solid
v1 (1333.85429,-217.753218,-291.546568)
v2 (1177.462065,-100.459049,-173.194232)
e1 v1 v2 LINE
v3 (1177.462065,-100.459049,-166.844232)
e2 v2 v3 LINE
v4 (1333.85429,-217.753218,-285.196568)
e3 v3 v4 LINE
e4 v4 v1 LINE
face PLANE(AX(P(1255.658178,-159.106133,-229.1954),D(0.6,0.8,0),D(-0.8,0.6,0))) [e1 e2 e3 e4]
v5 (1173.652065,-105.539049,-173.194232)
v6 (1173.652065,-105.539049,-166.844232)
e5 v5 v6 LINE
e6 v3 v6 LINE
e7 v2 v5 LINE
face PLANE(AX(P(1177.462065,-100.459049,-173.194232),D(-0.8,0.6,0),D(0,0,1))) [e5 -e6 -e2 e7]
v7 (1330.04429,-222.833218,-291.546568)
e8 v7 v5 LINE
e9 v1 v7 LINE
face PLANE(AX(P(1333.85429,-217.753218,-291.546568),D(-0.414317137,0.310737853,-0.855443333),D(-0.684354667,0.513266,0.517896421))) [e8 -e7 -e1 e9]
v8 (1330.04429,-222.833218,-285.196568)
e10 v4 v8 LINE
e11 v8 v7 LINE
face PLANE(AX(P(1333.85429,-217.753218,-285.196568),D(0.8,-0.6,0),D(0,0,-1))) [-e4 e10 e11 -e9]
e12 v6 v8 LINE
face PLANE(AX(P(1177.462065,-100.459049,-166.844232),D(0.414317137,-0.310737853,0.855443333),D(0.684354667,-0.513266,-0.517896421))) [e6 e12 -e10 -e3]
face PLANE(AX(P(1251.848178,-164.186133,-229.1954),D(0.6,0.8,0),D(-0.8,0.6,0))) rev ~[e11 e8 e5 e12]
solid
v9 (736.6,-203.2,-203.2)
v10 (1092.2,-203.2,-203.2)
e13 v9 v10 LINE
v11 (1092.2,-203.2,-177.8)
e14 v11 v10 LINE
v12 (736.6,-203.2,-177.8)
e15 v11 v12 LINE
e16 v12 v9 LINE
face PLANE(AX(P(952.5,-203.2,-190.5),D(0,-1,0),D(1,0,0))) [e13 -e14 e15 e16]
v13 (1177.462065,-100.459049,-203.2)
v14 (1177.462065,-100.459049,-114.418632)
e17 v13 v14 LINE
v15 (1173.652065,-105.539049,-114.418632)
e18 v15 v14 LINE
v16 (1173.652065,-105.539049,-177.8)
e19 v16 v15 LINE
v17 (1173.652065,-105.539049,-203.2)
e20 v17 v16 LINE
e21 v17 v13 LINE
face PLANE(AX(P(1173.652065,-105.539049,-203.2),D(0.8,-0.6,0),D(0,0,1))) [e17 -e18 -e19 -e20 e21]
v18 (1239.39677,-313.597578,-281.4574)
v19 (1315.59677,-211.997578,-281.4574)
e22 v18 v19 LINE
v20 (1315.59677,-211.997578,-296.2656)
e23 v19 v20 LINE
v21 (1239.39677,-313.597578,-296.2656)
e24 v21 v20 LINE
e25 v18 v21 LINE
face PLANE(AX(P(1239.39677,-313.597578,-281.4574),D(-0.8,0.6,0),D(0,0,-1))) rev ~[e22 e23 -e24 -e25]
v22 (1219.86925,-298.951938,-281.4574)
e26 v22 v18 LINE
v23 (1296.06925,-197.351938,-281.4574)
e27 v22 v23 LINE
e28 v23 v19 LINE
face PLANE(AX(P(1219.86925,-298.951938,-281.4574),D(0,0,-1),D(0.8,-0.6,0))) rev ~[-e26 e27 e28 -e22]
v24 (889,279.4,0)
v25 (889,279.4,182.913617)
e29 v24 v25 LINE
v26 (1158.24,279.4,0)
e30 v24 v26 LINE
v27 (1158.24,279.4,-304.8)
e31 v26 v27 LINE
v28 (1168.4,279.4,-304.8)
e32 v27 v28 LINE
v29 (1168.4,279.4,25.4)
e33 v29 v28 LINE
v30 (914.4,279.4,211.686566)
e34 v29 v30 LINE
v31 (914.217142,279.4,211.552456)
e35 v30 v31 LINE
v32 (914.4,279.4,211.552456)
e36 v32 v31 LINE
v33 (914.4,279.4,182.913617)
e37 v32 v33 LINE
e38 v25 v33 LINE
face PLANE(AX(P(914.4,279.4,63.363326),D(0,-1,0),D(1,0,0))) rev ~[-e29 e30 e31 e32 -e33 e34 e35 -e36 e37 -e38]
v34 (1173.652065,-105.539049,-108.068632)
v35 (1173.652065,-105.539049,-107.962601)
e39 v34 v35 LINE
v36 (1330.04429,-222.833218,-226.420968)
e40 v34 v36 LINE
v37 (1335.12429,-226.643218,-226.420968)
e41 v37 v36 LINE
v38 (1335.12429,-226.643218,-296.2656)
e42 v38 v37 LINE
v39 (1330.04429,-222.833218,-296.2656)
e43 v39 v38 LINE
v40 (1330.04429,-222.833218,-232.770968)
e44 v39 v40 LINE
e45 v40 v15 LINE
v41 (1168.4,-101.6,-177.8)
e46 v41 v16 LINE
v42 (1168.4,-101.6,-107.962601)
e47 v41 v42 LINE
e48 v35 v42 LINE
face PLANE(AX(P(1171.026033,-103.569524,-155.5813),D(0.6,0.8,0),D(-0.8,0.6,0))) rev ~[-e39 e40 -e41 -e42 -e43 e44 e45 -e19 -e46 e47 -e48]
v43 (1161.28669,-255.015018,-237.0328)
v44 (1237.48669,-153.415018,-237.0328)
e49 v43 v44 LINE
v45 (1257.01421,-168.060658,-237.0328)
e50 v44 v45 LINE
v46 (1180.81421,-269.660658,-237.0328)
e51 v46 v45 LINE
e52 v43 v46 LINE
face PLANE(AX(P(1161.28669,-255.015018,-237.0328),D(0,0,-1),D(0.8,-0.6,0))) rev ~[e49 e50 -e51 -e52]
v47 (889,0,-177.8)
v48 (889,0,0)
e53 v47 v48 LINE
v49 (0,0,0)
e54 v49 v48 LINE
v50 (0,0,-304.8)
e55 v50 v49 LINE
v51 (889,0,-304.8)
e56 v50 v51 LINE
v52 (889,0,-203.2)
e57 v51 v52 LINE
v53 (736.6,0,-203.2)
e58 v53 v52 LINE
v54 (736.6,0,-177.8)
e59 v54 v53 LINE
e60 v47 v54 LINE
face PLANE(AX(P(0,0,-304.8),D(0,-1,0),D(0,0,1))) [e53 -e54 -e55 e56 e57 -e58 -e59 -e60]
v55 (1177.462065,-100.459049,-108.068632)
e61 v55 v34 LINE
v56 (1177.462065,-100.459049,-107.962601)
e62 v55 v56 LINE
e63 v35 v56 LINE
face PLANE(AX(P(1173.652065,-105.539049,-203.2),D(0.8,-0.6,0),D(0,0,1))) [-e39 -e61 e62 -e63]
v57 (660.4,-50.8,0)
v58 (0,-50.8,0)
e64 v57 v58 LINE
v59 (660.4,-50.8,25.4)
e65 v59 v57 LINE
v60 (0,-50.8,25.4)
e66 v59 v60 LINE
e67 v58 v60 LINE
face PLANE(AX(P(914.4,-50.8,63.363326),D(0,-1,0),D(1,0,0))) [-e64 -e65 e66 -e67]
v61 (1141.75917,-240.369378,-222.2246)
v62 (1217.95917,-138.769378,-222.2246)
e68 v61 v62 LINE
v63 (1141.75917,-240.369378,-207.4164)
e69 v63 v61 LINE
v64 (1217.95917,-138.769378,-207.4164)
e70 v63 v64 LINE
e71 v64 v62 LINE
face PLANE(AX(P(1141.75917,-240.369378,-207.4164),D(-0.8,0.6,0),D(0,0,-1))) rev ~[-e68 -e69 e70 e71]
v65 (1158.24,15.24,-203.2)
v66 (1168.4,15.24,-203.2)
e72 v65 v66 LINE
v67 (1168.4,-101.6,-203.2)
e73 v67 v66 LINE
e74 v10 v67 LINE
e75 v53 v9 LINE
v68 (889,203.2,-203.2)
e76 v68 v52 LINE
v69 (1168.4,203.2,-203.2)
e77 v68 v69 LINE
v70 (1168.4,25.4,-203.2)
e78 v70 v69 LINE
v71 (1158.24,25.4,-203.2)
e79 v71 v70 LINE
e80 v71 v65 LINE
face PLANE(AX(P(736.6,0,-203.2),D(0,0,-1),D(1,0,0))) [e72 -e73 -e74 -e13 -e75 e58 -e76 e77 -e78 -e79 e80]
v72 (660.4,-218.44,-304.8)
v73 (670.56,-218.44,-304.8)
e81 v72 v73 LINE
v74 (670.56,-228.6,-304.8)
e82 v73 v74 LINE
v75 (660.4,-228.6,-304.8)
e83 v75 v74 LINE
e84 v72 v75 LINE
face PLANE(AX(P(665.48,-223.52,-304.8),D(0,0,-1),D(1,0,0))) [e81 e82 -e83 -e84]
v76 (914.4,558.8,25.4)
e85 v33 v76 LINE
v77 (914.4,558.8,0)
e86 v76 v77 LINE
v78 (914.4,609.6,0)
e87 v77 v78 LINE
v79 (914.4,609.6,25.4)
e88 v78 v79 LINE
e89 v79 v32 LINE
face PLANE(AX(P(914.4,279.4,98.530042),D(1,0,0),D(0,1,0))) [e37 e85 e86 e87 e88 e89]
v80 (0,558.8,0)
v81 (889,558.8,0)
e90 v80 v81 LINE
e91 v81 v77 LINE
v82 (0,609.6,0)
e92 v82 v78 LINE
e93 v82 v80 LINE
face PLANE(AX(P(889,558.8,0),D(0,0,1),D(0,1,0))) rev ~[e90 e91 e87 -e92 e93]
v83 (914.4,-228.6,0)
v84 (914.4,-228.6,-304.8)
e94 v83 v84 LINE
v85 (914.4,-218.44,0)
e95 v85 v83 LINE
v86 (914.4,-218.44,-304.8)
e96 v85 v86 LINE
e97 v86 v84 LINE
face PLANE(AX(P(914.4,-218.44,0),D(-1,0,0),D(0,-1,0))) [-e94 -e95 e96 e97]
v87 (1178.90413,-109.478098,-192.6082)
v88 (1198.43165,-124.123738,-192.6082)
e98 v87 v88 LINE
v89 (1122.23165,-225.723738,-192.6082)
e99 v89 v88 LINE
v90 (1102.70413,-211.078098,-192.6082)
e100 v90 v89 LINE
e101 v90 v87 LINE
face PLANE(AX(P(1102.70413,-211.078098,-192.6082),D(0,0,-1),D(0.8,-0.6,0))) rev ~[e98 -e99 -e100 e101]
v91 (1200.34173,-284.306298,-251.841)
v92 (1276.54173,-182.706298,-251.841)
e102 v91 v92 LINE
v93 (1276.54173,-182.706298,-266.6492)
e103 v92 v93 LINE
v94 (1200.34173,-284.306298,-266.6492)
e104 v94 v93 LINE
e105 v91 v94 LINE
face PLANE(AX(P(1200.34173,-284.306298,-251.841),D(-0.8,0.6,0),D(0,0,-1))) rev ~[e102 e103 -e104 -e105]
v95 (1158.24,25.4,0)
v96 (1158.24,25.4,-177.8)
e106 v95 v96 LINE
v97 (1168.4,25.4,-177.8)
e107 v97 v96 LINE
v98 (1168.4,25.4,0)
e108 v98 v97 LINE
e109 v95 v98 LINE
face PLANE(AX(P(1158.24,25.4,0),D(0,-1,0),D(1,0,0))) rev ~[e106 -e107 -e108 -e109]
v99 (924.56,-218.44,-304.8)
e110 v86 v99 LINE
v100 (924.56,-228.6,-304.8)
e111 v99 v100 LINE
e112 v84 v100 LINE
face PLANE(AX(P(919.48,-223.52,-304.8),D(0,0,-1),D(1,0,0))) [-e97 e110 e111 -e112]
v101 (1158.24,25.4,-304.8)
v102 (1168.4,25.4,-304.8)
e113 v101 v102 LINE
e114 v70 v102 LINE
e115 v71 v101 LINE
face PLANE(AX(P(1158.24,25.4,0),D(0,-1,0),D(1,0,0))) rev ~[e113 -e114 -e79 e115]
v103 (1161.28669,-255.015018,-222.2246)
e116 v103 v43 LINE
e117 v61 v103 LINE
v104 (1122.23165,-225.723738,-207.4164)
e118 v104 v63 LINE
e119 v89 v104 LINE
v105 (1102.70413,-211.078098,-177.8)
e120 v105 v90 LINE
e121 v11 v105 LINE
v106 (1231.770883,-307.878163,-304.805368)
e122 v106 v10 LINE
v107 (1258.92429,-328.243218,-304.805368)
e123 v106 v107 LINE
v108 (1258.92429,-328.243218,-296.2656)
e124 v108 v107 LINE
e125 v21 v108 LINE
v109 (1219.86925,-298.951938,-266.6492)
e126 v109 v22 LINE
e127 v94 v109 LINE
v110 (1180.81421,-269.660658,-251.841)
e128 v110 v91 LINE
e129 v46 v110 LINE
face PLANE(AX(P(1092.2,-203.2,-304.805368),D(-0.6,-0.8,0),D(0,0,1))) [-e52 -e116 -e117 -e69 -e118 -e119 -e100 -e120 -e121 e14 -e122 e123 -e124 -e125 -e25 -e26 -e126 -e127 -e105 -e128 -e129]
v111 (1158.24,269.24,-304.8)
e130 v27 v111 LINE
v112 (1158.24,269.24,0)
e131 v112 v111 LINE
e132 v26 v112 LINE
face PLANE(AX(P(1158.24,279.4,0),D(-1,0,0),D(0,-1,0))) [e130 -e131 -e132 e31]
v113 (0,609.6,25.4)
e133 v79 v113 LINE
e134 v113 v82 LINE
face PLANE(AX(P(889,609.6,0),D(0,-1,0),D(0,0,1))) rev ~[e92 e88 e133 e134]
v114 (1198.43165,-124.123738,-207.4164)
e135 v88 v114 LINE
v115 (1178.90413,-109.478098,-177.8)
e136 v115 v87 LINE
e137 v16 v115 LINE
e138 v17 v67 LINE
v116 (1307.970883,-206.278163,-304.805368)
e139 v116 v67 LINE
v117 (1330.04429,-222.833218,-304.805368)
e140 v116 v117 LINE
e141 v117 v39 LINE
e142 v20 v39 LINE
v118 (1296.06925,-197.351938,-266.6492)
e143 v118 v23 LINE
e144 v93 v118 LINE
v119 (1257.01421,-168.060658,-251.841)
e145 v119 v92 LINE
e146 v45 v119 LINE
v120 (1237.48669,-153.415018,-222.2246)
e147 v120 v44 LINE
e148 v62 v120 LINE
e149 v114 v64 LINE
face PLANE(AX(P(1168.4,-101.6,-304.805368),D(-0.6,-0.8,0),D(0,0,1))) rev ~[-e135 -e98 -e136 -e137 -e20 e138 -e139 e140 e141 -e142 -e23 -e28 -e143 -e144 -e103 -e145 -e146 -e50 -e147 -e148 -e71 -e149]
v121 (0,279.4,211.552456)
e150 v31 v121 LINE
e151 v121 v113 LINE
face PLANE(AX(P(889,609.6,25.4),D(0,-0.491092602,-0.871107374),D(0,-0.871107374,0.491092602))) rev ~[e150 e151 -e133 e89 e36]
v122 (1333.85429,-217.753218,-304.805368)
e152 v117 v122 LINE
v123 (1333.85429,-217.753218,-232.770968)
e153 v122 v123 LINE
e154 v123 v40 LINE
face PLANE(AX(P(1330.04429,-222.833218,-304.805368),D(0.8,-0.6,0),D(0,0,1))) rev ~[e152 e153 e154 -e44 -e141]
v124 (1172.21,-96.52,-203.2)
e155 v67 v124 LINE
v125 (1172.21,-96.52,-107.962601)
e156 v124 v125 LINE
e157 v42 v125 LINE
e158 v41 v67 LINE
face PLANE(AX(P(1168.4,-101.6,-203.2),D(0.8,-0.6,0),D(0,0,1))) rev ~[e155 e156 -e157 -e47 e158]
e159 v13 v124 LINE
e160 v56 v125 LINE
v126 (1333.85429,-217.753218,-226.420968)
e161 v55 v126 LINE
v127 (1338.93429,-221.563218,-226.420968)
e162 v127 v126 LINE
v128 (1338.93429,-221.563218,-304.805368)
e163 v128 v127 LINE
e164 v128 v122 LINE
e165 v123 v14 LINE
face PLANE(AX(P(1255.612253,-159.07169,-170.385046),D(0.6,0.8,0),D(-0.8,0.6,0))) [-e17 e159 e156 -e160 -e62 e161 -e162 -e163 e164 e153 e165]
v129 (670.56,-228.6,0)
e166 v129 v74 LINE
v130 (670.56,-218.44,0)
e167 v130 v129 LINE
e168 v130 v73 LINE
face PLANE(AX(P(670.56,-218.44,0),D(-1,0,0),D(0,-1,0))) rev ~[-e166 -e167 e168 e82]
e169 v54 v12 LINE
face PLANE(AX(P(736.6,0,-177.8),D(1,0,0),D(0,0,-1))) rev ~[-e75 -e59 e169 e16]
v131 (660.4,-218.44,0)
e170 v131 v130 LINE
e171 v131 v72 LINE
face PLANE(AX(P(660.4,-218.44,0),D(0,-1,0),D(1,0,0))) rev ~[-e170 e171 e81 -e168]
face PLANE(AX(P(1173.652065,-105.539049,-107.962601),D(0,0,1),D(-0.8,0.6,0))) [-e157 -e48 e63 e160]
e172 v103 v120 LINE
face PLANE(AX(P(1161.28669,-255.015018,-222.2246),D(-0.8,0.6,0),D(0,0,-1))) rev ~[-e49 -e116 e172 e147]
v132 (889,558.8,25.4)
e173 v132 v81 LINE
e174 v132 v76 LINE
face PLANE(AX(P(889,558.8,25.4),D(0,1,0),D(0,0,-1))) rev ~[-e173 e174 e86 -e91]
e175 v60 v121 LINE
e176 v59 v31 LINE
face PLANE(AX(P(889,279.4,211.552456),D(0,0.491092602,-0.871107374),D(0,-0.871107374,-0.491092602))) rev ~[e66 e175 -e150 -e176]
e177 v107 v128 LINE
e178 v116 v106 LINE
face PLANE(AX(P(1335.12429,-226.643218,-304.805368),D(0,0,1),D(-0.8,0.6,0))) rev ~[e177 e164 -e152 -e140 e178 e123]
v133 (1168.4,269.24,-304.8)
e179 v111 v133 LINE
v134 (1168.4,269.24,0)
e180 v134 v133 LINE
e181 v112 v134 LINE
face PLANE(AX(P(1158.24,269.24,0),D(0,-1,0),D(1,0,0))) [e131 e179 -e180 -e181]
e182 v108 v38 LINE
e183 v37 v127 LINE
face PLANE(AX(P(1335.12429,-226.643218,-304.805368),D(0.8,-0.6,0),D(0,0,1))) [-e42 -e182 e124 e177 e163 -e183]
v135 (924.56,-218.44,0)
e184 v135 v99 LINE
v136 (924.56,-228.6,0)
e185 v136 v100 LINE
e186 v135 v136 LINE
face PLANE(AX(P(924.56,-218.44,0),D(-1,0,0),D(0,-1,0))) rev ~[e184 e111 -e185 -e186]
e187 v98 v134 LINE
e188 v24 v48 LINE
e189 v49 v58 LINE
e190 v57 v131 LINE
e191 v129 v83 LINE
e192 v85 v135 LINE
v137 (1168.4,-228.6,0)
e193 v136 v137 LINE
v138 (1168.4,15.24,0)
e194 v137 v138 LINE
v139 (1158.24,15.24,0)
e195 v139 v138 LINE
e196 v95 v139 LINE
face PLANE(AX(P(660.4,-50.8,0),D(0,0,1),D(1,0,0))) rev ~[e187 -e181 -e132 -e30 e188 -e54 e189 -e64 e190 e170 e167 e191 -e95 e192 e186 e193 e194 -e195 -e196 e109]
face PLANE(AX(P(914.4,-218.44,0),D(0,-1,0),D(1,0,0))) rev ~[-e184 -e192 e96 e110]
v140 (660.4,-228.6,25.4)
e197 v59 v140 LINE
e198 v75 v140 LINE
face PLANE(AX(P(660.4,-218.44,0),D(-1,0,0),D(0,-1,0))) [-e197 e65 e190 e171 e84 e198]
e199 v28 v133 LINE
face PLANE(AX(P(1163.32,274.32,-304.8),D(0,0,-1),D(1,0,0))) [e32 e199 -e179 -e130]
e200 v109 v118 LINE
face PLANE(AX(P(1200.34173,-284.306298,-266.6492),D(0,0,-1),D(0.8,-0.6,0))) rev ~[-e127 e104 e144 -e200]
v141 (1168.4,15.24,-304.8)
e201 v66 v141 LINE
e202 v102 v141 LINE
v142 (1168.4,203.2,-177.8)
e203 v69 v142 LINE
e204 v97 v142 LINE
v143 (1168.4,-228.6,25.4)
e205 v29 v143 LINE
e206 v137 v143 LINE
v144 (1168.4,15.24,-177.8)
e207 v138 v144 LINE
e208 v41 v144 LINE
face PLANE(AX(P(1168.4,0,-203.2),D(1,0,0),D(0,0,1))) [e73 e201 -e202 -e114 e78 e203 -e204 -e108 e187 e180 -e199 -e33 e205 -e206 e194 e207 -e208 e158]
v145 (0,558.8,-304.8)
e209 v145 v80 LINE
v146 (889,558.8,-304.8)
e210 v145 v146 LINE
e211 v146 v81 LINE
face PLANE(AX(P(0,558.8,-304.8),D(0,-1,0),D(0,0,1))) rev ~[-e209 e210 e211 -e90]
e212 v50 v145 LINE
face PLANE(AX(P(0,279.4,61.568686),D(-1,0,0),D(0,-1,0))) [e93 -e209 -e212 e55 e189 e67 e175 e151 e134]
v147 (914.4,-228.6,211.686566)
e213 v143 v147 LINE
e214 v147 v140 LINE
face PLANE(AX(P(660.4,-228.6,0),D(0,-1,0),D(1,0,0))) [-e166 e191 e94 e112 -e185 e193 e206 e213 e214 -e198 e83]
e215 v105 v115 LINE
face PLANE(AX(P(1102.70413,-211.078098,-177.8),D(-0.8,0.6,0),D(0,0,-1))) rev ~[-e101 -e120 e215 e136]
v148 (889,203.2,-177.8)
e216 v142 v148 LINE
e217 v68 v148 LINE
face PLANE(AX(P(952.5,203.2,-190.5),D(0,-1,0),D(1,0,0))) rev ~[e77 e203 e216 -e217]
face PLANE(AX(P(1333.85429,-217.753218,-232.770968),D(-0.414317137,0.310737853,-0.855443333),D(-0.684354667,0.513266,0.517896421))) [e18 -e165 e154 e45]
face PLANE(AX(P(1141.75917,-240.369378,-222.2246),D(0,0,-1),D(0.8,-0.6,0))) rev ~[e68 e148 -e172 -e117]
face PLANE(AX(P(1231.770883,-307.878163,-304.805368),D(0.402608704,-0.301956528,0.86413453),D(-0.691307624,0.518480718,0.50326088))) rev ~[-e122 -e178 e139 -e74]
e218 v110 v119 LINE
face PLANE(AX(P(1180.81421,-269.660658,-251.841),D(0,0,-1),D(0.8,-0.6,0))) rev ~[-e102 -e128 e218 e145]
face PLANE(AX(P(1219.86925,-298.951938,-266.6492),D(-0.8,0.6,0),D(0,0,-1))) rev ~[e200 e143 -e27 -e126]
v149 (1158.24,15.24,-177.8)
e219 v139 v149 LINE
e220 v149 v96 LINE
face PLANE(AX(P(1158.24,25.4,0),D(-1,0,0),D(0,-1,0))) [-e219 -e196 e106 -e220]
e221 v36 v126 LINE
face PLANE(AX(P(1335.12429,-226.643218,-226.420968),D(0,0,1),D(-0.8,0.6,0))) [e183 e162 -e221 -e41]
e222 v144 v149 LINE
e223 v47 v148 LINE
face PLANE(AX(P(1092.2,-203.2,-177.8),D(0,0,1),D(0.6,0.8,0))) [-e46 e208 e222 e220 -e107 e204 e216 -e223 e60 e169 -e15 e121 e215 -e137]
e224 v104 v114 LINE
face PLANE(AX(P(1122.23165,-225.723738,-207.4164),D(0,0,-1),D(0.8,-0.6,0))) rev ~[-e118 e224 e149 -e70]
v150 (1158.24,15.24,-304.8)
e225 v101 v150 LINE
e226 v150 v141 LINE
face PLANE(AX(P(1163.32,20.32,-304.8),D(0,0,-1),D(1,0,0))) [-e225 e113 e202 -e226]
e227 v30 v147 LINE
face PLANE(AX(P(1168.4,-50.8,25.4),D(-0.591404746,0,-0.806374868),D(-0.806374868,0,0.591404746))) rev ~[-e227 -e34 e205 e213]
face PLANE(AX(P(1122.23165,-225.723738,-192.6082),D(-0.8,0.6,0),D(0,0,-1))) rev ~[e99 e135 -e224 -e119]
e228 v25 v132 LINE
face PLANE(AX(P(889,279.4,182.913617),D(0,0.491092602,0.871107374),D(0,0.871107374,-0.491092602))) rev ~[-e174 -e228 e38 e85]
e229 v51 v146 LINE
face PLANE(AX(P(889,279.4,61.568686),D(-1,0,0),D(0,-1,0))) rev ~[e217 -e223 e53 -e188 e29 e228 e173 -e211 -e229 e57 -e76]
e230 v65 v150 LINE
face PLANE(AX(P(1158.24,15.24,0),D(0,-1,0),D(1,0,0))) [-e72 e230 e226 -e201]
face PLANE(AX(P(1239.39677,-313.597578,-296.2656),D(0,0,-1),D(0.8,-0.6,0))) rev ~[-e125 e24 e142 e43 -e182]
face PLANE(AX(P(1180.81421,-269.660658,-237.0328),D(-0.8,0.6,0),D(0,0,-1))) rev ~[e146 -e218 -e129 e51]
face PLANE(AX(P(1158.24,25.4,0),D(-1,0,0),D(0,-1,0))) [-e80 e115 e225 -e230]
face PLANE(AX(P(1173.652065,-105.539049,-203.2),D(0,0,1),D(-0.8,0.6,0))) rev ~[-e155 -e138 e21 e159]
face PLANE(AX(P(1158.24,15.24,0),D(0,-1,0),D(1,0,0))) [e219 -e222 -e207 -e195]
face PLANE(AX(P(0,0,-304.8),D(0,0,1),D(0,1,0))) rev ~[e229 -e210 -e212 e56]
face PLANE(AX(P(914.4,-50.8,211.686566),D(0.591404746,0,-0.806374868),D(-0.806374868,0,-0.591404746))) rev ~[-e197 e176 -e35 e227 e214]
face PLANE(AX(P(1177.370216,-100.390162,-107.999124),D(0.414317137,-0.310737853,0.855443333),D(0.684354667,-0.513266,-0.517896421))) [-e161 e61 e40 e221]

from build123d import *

# Parameters (mm, degrees)
F0_W           = 558.8
F0_H           = 304.8
F1_DEPTH       = 889
F3_DEPTH       = 889
F5_DEPTH       = 25.4
F7_DEPTH       = 330.2
F7_DEPTH_BACK  = 177.8
F8_W           = 10.16
F8_H           = 10.16
F9_DEPTH       = 304.8
F11_DEPTH      = 203.2
F11_DEPTH_BACK = 203.2
F14_DEPTH      = 25.4
F15_W          = 6.35
F15_H          = 127.005368185
F16_DEPTH      = 304.8
F18_DEPTH      = 25.4
F19_DEPTH      = 127
F20_W          = 6.5650812721
F20_H          = 95.2373991132
F21_DEPTH      = 6.35
F22_W          = 6.35
F22_H          = 78.3844
F23_DEPTH      = 6.35
F25_DEPTH      = 6.35
F27_DEPTH      = 6.35


# Not quite as in the source:
# - a feature of the source that left no trace in its solid (it failed there, or was rolled back) is left out


with BuildPart() as f1:
    # F0 (on Right) → F1 (new body)
    with BuildSketch(Plane.YZ):
        with Locations((279.4, -152.4)):
            Rectangle(F0_W, F0_H)
    extrude(amount=F1_DEPTH)

    # F2 (on face) → F3 (join)
    with BuildSketch(Plane(origin=(0, 0, 0), x_dir=(0, -1, 0), z_dir=(-1, 0, 0))):
        Polygon((-609.6, 0), (-558.8, 0), (0, 0), (50.8, 0), (50.8, 25.4), (-279.4, 211.5524560213), (-609.6, 25.4), align=None)
    extrude(amount=-F3_DEPTH)

    # F4 (on face) → F5 (join)
    with BuildSketch(Plane.YZ.offset(889)):
        Polygon((-50.8, 25.4), (-50.8, 0), (0, 0), (0, 25.4), (279.4, 182.9136166334), (558.8, 25.4), (558.8, 0), (609.6, 0), (609.6, 25.4), (279.4, 211.5524560213), align=None)
    extrude(amount=F5_DEPTH)

    # F6 (on face) → F7 (join, two sides)
    with BuildSketch(Plane.XZ.offset(50.8)) as f7_sk:
        Polygon((889, 0), (914.4, 0), (1168.4, 0), (1168.4, 25.4), (914.4, 211.6865664721), (660.4, 25.4), (660.4, 0), align=None)
    extrude(amount=-F7_DEPTH)
    extrude(f7_sk.sketch, amount=F7_DEPTH_BACK)

    # F8 (on face) → F9 (join)
    with BuildSketch(Plane(origin=(0, 0, 0), x_dir=(1, 0, 0), z_dir=(0, 0, -1))):
        with Locations((665.48, 223.52)):
            Rectangle(F8_W, F8_H)
        with Locations((1163.32, -274.32)):
            Rectangle(F8_W, F8_H)
        with Locations((1163.32, -20.32)):
            Rectangle(F8_W, F8_H)
        with Locations((919.48, 223.52)):
            Rectangle(F8_W, F8_H)
    extrude(amount=F9_DEPTH)

    # F10 (on face) → F11 (join, two sides)
    with BuildSketch(Plane.XZ) as f11_sk:
        Polygon((1168.4, -177.8), (889, -177.8), (736.6, -177.8), (736.6, -203.2), (1168.4, -203.2), align=None)
    extrude(amount=F11_DEPTH)
    extrude(f11_sk.sketch, amount=-F11_DEPTH_BACK)

    # F13 (on face) → F14 (cut)
    with BuildSketch(Plane.XY.offset(-177.8)):
        Polygon((1092.2, -203.2), (1168.4, -203.2), (1168.4, -101.6), align=None)
    extrude(amount=-F14_DEPTH, mode=Mode.SUBTRACT)

    # F15 (on face) → F16 (join)
    with BuildSketch(Plane(origin=(796.544, -597.408, 0), x_dir=(0.6, 0.8, 0), z_dir=(0.8, -0.6, 0))):
        with Locations((495.935, -241.3026840925)):
            Rectangle(F15_W, F15_H)
    extrude(amount=F16_DEPTH)

    # F17 (on face) → F18 (cut)
    with BuildSketch(Plane(origin=(295.656, 394.208, 0), x_dir=(0.8, -0.6, 0), z_dir=(-0.6, -0.8, 0))):
        Polygon((1170.1436042786, -304.805368185), (995.68, -203.2), (995.68, -304.805368185), align=None)
        Polygon((1300.48, -177.8), (1008.8101625443, -177.8), (1008.8101625443, -192.6082), (1033.2195625443, -192.6082), (1033.2195625443, -207.4164), (1057.6289625443, -207.4164), (1057.6289625443, -222.2246), (1082.0383625443, -222.2246), (1082.0383625443, -237.0328), (1106.4477625443, -237.0328), (1106.4477625443, -251.841), (1130.8571625443, -251.841), (1130.8571625443, -266.6492), (1155.2665625443, -266.6492), (1155.2665625443, -281.4574), (1179.6759625442, -281.4574), (1179.6759625442, -296.2656), (1204.0853625442, -296.2656), (1204.0853625442, -304.805368185), (1300.48, -304.805368185), align=None)
    extrude(amount=-F18_DEPTH, mode=Mode.SUBTRACT)

    # F19 (add): a face of the model
    f19_faces = [f1.faces().sort_by_distance(p)[0] for p in [
        (1167.2257565811, -259.4693174358, -245.1597520789),
    ]]
    extrude(f19_faces, amount=-F19_DEPTH)

    # F20 (on face) → F21 (join)
    with BuildSketch(Plane(origin=(371.856, 495.808, 0), x_dir=(-0.8, 0.6, 0), z_dir=(0.6, 0.8, 0))):
        with Locations((-998.9625406361, -155.5813004434)):
            Rectangle(F20_W, F20_H)
    extrude(amount=F21_DEPTH)

    # F22 (on face) → F23 (join)
    with BuildSketch(Plane(origin=(371.856, 495.808, 0), x_dir=(-0.8, 0.6, 0), z_dir=(0.6, 0.8, 0))):
        with Locations((-1200.9103625442, -265.613168185)):
            Rectangle(F22_W, F22_H)
    extrude(amount=F23_DEPTH)

    # F24 (on face) → F25 (join)
    with BuildSketch(Plane(origin=(375.666, 500.888, 0), x_dir=(-0.8, 0.6, 0), z_dir=(0.6, 0.8, 0))):
        Polygon((-1002.1302700043, -107.9991236329), (-1197.7353625442, -226.420968185), (-1197.7353625442, -232.770968185), (-1002.1302700043, -114.3491236329), align=None)
    extrude(amount=-F25_DEPTH)


with BuildPart() as f27:
    # F26 (on face) → F27 (new body)
    with BuildSketch(Plane(origin=(375.666, 500.888, 0), x_dir=(-0.8, 0.6, 0), z_dir=(0.6, 0.8, 0))):
        Polygon((-1002.2450812721, -166.8442318545), (-1197.7353625442, -285.196568185), (-1197.7353625442, -291.546568185), (-1002.2450812721, -173.1942318545), align=None)
    extrude(amount=-F27_DEPTH)


solid = Compound([f1.part, f27.part])
